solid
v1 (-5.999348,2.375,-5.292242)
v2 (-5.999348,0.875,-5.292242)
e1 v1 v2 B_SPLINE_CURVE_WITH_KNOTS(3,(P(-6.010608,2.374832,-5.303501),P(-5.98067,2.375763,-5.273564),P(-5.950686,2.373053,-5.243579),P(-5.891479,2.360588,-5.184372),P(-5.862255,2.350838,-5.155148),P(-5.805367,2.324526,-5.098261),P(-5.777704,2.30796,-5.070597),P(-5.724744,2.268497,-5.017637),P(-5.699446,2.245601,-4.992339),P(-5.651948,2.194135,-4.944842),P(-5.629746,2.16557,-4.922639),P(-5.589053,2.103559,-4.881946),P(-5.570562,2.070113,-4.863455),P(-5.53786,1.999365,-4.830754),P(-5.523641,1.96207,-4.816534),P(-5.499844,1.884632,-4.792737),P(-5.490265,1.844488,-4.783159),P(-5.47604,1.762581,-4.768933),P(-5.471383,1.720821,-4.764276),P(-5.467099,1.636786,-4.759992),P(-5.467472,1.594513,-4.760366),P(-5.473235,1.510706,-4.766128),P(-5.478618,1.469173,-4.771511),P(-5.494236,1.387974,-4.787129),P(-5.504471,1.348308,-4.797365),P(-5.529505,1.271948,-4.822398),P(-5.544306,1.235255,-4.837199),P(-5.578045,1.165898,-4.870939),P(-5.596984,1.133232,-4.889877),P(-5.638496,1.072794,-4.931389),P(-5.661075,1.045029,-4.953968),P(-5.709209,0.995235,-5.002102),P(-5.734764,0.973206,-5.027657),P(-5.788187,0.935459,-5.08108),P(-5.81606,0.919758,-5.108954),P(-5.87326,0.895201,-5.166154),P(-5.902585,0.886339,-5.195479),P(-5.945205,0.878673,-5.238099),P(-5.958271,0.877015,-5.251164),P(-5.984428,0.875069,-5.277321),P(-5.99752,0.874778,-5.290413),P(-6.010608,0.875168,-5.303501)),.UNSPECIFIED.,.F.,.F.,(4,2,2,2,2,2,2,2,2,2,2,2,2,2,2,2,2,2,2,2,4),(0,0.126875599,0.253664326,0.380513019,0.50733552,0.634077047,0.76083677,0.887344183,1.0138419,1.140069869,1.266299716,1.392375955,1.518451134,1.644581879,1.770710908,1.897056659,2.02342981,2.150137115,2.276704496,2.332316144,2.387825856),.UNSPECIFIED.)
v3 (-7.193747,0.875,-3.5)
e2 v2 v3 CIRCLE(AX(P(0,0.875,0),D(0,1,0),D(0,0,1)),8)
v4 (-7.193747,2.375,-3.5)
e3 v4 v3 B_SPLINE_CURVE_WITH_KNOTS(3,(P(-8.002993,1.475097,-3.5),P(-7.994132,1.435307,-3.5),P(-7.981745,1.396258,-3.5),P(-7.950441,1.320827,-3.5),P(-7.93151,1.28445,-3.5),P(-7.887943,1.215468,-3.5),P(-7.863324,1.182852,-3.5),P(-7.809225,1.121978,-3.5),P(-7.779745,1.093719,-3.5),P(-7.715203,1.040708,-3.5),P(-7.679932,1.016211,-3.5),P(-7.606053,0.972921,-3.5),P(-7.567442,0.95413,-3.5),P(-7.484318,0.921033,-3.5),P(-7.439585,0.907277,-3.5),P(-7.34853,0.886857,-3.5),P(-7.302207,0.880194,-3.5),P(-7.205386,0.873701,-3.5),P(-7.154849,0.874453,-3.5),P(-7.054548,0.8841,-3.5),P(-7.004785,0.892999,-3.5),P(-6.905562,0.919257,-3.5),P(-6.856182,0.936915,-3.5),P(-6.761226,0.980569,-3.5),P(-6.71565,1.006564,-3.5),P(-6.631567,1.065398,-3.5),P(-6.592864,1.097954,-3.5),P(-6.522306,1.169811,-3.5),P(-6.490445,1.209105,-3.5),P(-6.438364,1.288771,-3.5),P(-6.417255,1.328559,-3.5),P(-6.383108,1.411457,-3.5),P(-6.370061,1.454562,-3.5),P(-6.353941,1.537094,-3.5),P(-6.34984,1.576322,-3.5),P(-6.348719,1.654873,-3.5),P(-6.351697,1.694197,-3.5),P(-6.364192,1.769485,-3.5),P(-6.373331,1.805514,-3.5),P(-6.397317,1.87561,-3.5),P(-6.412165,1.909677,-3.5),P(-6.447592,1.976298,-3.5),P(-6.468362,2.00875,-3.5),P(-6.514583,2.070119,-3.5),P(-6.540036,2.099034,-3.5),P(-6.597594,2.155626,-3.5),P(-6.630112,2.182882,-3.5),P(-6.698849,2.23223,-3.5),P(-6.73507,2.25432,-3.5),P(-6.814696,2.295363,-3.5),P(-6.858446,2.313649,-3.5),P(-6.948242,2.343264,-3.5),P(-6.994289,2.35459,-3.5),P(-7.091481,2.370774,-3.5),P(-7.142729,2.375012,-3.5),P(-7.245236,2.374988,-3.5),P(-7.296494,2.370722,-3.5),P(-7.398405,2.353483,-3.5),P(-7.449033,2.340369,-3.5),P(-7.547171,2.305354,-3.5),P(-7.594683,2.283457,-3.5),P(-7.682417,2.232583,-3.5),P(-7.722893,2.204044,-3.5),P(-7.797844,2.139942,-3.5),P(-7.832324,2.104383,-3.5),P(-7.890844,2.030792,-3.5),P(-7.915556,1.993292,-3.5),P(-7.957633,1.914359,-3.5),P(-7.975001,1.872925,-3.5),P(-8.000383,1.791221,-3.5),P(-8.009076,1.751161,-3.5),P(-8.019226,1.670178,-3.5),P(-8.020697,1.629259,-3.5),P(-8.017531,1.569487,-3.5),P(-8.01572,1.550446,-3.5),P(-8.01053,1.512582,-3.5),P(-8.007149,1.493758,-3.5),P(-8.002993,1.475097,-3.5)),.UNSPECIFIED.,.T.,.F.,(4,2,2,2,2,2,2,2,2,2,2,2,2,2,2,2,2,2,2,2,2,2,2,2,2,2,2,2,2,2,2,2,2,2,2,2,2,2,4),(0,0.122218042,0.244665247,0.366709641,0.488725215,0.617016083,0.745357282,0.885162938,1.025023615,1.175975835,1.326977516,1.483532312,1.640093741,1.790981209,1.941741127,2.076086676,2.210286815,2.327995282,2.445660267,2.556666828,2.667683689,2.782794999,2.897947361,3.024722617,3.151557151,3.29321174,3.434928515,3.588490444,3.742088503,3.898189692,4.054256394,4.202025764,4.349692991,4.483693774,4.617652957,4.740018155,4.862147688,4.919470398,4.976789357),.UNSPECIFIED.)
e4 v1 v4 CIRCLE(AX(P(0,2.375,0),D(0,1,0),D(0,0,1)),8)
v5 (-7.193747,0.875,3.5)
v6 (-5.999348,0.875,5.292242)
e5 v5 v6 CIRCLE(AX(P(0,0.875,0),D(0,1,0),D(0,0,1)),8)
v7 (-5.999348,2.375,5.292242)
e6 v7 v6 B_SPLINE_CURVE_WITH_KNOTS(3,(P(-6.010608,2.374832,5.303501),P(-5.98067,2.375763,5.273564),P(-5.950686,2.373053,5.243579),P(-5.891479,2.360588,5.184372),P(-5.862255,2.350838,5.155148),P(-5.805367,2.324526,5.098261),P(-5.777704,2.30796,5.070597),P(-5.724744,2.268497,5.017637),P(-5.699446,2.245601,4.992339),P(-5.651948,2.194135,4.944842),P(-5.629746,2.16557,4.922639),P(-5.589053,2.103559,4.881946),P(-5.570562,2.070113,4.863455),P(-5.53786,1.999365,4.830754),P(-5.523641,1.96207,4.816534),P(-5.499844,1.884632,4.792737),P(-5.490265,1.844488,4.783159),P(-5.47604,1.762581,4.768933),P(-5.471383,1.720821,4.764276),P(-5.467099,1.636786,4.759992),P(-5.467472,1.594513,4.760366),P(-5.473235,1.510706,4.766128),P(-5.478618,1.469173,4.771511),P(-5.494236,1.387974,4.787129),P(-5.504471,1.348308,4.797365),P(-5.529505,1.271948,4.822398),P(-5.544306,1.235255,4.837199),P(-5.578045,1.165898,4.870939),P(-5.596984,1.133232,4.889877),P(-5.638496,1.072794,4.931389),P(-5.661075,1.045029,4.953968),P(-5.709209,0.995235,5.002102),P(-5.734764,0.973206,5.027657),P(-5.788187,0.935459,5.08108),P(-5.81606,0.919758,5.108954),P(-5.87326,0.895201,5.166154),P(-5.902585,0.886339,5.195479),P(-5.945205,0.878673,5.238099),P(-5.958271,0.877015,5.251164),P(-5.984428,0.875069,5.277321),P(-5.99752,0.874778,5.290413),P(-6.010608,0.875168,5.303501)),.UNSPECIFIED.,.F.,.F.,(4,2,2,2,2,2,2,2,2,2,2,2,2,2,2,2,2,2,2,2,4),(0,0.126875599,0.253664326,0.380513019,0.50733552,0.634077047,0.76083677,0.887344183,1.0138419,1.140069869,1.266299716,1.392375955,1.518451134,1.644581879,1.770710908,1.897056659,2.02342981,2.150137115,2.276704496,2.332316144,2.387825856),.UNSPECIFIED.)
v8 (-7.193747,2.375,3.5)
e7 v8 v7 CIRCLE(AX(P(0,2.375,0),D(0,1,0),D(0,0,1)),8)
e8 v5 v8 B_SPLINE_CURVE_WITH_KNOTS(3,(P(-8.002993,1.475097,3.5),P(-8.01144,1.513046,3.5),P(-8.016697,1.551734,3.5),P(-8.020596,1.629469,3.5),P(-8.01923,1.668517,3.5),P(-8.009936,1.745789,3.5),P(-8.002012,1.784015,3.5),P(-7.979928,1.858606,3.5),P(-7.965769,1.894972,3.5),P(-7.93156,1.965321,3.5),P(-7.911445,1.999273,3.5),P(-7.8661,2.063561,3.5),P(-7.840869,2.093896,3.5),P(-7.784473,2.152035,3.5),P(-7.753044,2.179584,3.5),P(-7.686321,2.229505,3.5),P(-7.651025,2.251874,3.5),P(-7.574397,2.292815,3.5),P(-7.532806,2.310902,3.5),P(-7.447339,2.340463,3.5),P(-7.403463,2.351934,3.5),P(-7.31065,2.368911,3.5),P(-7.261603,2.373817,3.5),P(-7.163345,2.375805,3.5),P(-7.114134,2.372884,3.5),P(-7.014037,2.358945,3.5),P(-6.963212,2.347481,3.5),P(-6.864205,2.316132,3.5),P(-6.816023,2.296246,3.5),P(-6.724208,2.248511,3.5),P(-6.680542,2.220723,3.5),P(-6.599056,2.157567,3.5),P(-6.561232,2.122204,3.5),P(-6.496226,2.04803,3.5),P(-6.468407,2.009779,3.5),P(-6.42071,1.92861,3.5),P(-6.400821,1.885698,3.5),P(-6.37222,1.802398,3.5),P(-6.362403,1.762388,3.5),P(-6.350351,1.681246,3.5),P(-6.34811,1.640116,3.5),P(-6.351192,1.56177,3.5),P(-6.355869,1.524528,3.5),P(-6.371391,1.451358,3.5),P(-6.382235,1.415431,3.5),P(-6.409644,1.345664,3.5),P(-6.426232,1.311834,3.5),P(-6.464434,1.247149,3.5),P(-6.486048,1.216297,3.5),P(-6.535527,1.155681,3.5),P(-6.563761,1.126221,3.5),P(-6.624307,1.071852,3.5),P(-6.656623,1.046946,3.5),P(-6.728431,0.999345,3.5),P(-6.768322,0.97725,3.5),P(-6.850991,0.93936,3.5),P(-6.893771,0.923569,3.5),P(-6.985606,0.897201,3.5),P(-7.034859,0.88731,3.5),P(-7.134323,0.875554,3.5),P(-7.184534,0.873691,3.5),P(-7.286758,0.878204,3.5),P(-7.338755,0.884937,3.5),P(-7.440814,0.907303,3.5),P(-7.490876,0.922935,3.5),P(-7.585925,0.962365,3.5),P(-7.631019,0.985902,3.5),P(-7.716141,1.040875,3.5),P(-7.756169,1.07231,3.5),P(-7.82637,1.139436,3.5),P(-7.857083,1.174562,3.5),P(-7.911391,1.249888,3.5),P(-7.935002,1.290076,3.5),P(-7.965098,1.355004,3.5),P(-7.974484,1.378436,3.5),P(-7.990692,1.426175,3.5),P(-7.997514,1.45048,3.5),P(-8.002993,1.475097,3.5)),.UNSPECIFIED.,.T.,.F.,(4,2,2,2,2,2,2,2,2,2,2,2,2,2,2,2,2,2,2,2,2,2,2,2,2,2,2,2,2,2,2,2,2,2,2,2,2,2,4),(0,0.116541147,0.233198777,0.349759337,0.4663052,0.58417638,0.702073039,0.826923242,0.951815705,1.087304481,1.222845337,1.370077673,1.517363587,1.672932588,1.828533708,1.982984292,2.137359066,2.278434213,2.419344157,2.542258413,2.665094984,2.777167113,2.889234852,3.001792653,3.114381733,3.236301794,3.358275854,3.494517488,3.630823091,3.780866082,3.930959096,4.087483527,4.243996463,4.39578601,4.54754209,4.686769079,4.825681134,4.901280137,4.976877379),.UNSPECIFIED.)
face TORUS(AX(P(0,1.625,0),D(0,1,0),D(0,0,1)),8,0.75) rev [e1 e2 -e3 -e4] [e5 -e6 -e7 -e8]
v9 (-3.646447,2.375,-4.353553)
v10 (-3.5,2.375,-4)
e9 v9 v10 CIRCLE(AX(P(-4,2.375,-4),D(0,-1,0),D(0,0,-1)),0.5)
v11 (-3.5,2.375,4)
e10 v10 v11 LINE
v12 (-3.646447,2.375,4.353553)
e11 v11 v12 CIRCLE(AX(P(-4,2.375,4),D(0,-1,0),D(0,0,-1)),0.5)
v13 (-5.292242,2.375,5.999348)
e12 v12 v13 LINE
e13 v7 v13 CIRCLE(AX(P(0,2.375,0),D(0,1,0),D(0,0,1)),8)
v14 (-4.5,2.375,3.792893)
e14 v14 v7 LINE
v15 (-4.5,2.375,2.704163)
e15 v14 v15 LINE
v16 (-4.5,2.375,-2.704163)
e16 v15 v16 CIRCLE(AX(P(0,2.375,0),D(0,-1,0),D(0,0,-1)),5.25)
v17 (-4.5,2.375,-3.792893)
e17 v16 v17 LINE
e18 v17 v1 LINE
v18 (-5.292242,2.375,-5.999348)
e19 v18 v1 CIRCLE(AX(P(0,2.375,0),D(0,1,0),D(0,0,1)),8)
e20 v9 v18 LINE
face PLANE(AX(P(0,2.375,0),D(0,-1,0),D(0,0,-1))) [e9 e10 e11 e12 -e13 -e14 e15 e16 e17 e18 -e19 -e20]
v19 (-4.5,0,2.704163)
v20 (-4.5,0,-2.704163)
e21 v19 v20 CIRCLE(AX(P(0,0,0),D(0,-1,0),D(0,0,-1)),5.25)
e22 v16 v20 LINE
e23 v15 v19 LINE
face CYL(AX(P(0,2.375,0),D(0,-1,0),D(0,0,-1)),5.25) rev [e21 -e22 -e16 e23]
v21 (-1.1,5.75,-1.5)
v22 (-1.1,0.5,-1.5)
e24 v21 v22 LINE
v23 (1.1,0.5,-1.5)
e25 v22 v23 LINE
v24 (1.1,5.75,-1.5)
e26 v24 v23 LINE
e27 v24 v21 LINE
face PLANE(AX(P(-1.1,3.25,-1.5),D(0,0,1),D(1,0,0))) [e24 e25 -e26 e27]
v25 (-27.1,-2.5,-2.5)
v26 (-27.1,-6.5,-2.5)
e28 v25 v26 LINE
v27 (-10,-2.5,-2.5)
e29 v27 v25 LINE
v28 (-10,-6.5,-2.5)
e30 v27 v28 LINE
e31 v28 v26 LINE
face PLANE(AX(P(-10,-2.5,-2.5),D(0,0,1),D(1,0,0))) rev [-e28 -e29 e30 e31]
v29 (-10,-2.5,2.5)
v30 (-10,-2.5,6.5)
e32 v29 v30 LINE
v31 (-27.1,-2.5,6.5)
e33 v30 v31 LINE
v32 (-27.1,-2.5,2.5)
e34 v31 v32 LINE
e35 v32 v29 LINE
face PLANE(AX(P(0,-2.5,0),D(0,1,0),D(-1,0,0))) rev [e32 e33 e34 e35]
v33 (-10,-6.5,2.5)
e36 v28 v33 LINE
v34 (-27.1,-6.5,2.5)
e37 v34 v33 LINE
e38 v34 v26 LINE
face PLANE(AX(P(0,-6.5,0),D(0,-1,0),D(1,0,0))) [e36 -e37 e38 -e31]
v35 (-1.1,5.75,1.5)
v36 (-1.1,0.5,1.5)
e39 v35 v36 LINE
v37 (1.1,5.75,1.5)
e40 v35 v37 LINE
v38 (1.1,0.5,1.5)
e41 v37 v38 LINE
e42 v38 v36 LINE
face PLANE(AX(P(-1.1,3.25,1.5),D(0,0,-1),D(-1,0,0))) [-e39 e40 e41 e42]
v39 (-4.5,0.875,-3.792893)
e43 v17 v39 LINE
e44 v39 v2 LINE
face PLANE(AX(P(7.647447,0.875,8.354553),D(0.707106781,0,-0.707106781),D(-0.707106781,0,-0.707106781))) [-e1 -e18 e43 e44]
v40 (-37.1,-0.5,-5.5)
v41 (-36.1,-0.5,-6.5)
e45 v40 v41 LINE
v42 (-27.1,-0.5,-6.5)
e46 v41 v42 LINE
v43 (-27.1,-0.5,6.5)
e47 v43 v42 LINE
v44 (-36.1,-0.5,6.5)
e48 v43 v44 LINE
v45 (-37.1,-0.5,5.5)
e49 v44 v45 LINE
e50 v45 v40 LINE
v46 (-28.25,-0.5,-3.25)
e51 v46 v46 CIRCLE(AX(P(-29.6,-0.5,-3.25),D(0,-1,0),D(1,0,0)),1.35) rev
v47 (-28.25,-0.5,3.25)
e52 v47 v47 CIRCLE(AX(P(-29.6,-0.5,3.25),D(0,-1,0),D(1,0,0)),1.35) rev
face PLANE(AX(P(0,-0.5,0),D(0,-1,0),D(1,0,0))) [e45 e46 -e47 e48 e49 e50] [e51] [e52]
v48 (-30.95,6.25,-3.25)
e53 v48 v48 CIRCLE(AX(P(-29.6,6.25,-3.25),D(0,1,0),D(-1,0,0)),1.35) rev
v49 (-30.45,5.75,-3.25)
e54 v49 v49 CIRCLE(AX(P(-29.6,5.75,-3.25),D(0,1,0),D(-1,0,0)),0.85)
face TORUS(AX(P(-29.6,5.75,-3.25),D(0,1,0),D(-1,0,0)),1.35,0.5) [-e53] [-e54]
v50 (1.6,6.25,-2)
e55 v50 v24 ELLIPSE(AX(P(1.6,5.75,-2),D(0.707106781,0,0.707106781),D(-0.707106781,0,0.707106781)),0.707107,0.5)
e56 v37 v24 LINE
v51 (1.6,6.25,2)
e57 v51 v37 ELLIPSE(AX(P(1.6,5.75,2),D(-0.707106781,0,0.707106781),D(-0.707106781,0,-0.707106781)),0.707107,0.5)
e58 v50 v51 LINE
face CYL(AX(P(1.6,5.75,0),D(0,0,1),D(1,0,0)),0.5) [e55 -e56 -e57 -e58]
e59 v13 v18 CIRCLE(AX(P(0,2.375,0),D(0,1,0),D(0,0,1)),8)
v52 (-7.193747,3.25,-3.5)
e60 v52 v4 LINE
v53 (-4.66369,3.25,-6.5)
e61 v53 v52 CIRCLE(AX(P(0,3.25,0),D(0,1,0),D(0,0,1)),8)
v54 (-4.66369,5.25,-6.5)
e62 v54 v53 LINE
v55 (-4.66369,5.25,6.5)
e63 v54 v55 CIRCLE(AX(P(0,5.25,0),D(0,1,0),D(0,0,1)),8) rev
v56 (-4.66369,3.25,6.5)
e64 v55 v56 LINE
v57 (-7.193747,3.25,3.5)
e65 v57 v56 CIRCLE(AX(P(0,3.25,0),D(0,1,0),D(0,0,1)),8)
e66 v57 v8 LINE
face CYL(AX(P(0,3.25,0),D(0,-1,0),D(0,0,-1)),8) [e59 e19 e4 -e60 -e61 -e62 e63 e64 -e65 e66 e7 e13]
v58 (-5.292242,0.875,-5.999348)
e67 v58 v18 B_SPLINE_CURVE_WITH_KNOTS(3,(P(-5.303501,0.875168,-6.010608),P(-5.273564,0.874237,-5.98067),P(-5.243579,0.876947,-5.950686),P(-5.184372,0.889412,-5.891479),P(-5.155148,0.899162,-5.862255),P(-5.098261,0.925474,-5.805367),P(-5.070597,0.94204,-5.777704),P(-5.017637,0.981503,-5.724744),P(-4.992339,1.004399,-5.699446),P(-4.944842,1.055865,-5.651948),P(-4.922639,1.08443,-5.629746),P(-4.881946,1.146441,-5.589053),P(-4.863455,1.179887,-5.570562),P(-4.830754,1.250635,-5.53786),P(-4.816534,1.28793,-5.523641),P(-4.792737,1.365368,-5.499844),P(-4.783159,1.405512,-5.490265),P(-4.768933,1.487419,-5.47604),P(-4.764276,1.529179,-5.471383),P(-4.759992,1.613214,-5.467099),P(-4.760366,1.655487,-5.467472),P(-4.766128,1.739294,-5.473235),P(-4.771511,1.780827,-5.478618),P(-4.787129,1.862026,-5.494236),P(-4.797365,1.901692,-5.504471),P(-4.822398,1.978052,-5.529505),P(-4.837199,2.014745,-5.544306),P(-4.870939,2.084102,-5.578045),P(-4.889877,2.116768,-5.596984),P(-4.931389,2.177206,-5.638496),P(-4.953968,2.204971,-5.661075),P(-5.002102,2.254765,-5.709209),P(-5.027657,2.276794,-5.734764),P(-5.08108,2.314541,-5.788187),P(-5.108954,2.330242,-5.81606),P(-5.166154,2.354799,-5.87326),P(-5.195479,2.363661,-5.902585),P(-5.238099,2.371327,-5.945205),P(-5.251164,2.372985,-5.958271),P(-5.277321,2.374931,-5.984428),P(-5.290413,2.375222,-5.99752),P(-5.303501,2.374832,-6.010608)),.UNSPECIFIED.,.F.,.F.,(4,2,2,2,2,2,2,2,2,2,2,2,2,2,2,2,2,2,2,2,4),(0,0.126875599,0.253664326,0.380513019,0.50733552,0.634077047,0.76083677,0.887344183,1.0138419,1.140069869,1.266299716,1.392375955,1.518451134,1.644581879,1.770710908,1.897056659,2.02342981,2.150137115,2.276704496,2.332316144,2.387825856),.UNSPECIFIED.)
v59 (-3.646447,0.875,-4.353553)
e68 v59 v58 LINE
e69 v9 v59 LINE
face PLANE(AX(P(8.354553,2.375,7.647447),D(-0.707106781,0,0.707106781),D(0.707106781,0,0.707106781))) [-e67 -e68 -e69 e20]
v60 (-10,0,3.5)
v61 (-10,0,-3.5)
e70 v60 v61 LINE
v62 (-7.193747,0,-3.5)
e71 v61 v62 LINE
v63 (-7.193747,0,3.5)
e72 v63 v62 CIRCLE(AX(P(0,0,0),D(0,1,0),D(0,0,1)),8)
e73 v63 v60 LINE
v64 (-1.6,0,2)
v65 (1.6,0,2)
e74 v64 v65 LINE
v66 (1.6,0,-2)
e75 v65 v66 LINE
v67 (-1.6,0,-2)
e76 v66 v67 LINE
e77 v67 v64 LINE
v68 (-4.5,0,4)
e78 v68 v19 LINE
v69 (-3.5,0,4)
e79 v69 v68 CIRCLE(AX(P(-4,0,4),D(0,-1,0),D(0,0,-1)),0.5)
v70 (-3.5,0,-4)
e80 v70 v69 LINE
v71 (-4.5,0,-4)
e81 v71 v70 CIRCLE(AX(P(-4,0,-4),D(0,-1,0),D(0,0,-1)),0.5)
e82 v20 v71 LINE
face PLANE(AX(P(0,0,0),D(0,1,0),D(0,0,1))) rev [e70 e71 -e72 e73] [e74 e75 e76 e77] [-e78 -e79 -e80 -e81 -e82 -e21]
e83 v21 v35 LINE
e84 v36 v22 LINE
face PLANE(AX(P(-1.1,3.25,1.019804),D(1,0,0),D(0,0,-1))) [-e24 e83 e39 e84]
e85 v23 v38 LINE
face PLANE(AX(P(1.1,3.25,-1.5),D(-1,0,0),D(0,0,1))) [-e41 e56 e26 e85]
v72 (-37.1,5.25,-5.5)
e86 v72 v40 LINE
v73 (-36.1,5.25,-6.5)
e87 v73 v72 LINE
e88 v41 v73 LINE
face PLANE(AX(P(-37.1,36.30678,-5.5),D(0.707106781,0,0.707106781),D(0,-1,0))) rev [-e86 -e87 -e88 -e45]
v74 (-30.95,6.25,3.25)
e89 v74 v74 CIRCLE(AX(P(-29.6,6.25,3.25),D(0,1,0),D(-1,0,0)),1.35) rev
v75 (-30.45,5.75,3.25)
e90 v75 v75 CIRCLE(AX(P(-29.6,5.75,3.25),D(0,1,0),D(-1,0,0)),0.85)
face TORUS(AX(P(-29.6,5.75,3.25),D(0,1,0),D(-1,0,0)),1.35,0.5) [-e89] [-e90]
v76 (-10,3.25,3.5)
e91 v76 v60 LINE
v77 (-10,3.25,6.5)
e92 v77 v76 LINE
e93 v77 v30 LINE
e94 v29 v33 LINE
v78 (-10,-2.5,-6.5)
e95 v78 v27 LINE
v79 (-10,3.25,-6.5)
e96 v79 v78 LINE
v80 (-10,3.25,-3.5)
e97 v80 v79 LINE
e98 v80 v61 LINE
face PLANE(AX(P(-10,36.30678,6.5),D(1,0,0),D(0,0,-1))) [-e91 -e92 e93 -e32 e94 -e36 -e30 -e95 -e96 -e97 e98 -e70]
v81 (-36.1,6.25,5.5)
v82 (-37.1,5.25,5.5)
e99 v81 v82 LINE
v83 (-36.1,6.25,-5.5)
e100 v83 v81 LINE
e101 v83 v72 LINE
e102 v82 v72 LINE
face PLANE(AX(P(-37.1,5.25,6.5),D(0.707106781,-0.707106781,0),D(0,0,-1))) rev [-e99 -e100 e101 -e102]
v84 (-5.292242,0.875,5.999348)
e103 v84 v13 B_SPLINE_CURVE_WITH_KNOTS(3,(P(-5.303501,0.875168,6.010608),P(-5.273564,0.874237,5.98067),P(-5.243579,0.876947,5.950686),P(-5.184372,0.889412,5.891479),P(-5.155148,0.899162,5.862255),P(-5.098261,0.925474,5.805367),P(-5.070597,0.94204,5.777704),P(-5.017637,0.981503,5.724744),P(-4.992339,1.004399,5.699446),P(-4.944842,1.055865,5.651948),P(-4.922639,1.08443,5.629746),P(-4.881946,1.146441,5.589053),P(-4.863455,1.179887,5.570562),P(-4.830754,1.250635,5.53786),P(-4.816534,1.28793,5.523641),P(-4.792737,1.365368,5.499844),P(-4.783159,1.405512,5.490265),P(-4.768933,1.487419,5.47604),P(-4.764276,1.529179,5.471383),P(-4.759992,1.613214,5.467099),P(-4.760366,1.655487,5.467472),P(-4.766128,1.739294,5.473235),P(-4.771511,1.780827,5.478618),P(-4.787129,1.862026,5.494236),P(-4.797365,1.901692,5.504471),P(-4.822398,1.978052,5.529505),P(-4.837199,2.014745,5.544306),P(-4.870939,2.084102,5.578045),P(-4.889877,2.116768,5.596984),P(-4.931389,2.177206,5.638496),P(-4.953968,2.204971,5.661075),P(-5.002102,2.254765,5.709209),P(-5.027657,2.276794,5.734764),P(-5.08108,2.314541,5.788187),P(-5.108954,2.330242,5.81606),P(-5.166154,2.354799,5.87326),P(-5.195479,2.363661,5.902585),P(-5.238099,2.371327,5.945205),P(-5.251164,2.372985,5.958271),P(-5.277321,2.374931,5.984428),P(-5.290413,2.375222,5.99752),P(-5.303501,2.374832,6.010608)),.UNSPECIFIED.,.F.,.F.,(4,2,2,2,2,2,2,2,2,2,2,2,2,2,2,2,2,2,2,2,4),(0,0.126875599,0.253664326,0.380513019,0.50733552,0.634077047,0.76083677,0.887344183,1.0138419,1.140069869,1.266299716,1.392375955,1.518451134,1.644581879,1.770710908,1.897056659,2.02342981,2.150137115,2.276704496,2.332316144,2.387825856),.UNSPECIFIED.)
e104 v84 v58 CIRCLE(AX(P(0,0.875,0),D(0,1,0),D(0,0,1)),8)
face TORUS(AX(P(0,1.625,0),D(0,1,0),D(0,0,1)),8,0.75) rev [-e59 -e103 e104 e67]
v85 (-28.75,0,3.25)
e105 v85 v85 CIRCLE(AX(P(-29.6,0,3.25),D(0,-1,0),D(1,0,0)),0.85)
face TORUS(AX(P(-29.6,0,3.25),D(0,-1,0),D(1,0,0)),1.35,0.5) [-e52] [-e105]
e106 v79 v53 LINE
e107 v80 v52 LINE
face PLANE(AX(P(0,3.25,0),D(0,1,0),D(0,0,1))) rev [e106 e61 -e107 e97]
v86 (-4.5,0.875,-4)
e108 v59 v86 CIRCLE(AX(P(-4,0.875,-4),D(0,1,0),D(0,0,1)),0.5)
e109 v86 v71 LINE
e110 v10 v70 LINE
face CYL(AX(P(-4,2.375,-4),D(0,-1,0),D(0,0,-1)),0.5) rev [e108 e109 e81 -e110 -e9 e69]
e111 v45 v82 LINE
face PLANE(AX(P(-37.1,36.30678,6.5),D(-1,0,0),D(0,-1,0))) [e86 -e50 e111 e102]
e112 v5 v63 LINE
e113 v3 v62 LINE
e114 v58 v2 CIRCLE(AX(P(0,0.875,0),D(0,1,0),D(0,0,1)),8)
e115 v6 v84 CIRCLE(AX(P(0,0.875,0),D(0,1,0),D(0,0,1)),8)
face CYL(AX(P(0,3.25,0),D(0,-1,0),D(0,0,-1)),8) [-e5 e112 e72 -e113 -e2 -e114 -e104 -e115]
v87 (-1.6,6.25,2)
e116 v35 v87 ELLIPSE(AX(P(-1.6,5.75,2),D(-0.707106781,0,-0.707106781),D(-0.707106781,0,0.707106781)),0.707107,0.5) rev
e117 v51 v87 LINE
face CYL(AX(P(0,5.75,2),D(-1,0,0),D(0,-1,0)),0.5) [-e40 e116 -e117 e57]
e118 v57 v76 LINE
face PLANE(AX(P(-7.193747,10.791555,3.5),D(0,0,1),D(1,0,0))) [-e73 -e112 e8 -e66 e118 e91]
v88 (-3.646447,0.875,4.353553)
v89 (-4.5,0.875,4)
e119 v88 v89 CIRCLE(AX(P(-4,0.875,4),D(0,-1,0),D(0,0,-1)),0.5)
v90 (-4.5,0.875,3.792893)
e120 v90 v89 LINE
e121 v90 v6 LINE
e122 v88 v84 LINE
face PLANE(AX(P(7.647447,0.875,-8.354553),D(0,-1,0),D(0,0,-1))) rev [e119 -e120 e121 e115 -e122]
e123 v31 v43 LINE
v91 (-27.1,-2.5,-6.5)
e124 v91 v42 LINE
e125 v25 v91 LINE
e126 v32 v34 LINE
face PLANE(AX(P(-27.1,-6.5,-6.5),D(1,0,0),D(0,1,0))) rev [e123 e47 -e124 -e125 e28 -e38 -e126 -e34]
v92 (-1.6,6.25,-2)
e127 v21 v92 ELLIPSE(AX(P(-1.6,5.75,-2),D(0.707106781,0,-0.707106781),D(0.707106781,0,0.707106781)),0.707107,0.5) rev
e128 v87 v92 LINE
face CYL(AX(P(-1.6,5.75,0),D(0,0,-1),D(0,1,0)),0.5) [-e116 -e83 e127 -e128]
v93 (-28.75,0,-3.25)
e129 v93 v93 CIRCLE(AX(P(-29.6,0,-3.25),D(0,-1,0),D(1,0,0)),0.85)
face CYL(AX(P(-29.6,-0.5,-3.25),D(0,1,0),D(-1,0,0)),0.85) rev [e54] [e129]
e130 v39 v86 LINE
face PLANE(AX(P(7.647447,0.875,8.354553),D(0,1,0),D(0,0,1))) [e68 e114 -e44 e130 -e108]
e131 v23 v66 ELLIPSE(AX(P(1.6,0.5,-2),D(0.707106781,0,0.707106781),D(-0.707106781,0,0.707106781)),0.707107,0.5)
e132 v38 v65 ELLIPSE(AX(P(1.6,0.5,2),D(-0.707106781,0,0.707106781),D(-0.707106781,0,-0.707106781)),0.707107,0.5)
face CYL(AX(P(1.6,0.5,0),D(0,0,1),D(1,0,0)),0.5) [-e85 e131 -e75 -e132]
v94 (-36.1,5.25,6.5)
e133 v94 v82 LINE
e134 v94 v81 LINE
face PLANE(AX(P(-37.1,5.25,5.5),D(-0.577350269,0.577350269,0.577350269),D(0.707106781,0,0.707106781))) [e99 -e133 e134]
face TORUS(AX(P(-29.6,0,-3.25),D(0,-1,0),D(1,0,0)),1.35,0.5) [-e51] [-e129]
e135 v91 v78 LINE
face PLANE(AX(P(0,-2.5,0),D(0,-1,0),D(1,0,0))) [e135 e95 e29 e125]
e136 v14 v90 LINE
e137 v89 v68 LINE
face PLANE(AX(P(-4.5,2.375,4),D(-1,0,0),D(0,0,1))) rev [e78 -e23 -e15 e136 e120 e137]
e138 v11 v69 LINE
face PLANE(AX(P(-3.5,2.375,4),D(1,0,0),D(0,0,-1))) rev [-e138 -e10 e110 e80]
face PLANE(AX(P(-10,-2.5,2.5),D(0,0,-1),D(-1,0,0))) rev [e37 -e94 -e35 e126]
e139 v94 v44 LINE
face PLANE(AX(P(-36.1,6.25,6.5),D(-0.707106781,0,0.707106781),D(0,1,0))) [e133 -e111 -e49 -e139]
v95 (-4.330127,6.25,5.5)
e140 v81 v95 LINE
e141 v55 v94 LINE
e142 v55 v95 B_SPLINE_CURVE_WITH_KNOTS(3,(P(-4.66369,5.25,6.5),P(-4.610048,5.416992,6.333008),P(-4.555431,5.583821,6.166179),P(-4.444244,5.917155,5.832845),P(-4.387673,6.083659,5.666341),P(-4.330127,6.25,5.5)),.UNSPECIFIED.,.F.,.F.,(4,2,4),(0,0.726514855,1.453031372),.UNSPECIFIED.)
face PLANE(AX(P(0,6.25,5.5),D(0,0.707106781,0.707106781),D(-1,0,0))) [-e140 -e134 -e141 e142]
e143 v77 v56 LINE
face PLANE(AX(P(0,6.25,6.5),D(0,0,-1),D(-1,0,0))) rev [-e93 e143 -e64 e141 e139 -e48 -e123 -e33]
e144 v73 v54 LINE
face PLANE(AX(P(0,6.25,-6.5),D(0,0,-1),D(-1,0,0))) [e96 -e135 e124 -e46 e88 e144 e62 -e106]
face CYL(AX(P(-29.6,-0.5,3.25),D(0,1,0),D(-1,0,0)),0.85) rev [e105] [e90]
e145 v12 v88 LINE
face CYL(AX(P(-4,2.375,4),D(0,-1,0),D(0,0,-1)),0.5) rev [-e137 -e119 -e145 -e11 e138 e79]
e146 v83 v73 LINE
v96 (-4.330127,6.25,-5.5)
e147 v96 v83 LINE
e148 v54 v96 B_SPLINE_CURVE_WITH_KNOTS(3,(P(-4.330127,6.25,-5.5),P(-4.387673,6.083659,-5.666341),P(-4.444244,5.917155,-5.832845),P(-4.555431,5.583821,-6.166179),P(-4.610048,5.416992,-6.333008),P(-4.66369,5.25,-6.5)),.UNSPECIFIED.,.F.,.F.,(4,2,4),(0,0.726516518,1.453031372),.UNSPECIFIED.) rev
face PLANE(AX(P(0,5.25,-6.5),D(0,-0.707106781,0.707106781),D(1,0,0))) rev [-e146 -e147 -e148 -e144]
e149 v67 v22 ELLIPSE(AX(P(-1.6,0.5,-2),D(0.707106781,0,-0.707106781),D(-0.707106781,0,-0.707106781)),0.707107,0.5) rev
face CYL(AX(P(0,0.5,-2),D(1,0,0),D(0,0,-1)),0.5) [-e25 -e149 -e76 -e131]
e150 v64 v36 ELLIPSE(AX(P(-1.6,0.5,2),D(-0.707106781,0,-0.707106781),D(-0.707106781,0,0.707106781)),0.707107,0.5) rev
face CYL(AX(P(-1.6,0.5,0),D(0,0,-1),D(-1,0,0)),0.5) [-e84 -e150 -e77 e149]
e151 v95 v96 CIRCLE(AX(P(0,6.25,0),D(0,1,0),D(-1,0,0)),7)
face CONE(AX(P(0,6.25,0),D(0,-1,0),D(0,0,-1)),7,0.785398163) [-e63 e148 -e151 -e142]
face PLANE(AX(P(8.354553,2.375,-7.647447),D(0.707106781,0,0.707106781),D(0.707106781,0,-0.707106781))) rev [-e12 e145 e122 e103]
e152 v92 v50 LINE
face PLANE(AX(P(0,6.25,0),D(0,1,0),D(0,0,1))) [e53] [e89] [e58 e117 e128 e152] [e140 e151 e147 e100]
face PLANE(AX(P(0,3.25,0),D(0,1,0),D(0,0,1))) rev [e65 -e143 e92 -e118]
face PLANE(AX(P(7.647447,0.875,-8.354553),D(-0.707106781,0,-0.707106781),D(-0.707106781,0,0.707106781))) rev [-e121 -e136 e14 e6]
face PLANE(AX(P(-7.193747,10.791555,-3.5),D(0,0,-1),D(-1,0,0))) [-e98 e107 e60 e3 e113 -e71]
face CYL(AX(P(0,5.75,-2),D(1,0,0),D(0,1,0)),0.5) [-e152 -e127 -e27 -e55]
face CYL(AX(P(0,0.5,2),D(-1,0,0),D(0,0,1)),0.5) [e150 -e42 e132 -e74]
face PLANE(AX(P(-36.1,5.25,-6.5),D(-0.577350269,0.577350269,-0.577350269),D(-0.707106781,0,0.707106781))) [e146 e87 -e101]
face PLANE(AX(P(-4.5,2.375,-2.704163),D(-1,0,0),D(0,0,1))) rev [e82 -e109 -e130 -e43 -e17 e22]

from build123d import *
from build123d.topology import SkipClean

# Parameters (mm, degrees)
SKETCH1_R               = 8
BOSS_EXTRUDE1_DEPTH     = 3.25
SKETCH3_R               = 8
SKETCH3_W               = 2.2
SKETCH3_H               = 3
BOSS_EXTRUDE2_DEPTH     = 3
BOSS_EXTRUDE3_START     = -3
SKETCH4_W               = 27.1
SKETCH4_H               = 13
BOSS_EXTRUDE3_DEPTH     = 6.75
CUT_EXTRUDE1_DEPTH      = 39.548313841
CUT_EXTRUDE1_DEPTH_BACK = 39.548313841
SKETCH5_R               = 0.85
CUT_EXTRUDE2_DEPTH      = 2.375
CUT_EXTRUDE3_REACH      = 36.846
CUT_EXTRUDE3_END_RADIUS = 0.5
SKETCH7_W               = 1
SKETCH7_H               = 1.5
CUT_EXTRUDE4_REACH      = 36.846
CUT_EXTRUDE4_END_RADIUS = 0.5
SKETCH8_W               = 1
SKETCH8_H               = 1.5
FILLET1_R               = 0.5
CHAMFER1_SIZE           = 1
BOSS_EXTRUDE4_REACH     = 40.464
SKETCH11_W              = 17.1
SKETCH11_H              = 13
BOSS_EXTRUDE5_DEPTH     = 6
SKETCH12_W              = 17.1
SKETCH12_H              = 4
CUT_EXTRUDE5_DEPTH      = 4


# Read off the part's stored shape, not the designer's step: Cut-Revolve2
with BuildPart() as part:
    # Sketch1 → Boss-Extrude1 (new body)
    with BuildSketch(Plane(origin=(0, 0, 0), x_dir=(1, 0, 0), z_dir=(0, 1, 0))):
        with Locations(Location((0, 0, 0), (0, 0, 90))):
            Circle(SKETCH1_R)
        Polygon((-1.1, 1.019803903), (-1.1, -1.019803903), (-1.1, -1.5), (1.1, -1.5), (1.1, -1.019803903), (1.1, 1.019803903), (1.1, 1.5), (-1.1, 1.5), align=None, mode=Mode.SUBTRACT)
    extrude(amount=BOSS_EXTRUDE1_DEPTH)

    # Sketch2 → Cut-Revolve1 (revolve, cut)
    with BuildSketch(Plane(origin=(0, 0, 0), x_dir=(0, 0, -1), z_dir=(1, 0, 0))):
        with BuildLine():
            Line((8, 0.875), (8, 2.375))
            ThreePointArc((8, 2.375), (7.25, 1.625), (8, 0.875))
        make_face()
    revolve(axis=Axis((0, 3.25, 0), (0, -1, 0)), mode=Mode.SUBTRACT)

    # Sketch3 → Boss-Extrude2 (add)
    # profile 1 of 2: a face of its own
    with BuildSketch(Plane(origin=(0, 3.25, 0), x_dir=(1, 0, 0), z_dir=(0, 1, 0))):
        with Locations(Location((0, 0, 0), (0, 0, 125.659087696))):
            Circle(SKETCH3_R)
        Rectangle(SKETCH3_W, SKETCH3_H, mode=Mode.SUBTRACT)
    # profile 2 of 2: a face of its own
    with BuildSketch(Plane(origin=(0, 3.25, 0), x_dir=(1, 0, 0), z_dir=(0, 1, 0))):
        with BuildLine():
            Line((-4.663689527, 6.5), (-15, 6.5))
            Line((-15, 6.5), (-15, -6.5))
            Line((-15, -6.5), (-4.663689527, -6.5))
            ThreePointArc((-4.663689527, -6.5), (-8, 0), (-4.663689527, 6.5))
        make_face()
    extrude(amount=BOSS_EXTRUDE2_DEPTH)

    # Sketch4 → Boss-Extrude3 (add)
    with BuildSketch(Plane.XZ.offset(-3.25).offset(BOSS_EXTRUDE3_START)):
        with Locations((-23.55, 0)):
            Rectangle(SKETCH4_W, SKETCH4_H)
    extrude(amount=BOSS_EXTRUDE3_DEPTH)

    # Sketch5 → Cut-Extrude1 (cut, two sides: drawn at the far end of the back side and taken through both)
    with BuildSketch(Plane(origin=(0, 6.25, 0), x_dir=(1, 0, 0), z_dir=(0, 1, 0)).offset(-CUT_EXTRUDE1_DEPTH_BACK)):
        with Locations(Location((-29.6, 3.25, 0), (0, 0, 180))):
            Circle(SKETCH5_R)
        with Locations(Location((-29.6, -3.25, 0), (0, 0, 180))):
            Circle(SKETCH5_R)
    extrude(amount=CUT_EXTRUDE1_DEPTH + CUT_EXTRUDE1_DEPTH_BACK, mode=Mode.SUBTRACT)

    # Sketch6 → Cut-Extrude2 (cut)
    with BuildSketch(Plane(origin=(0, 0, 0), x_dir=(-1, 0, 0), z_dir=(0, -1, 0))):
        with BuildLine():
            Line((3.5, -4), (3.5, 4))
            ThreePointArc((3.5, 4), (4, 4.5), (4.5, 4))
            Line((4.5, 4), (4.5, 2.704163457))
            ThreePointArc((4.5, 2.704163457), (5.25, 0), (4.5, -2.704163457))
            Line((4.5, -2.704163457), (4.5, -4))
            ThreePointArc((4.5, -4), (4, -4.5), (3.5, -4))
        make_face()
    extrude(amount=-CUT_EXTRUDE2_DEPTH, mode=Mode.SUBTRACT)

    # Cut-Extrude3: up to this cylinder (the profile starts outside it)
    cut_extrude3_end = Plane(origin=(-4, 1.625, 4), z_dir=(0, -1, 0)) * Cylinder(CUT_EXTRUDE3_END_RADIUS, 75.692, mode=Mode.PRIVATE)
    # Sketch7 → Cut-Extrude3 (cut, up to the surface)
    with BuildSketch(Plane(origin=(-5.656854249, 0, 5.656854249), x_dir=(0.707106781186546, 0, 0.7071067811865491), z_dir=(-0.7071067811865491, 0, 0.707106781186546)), mode=Mode.PRIVATE) as cut_extrude3_sk1:
        with Locations((0, 1.625)):
            Rectangle(SKETCH7_W, SKETCH7_H)
    cut_extrude3_tool1 = extrude(cut_extrude3_sk1.sketch, amount=-CUT_EXTRUDE3_REACH, mode=Mode.PRIVATE) - cut_extrude3_end
    add(cut_extrude3_tool1.solids().sort_by_distance((-5.656854, 1.625, 5.656854))[0], mode=Mode.SUBTRACT)

    # Cut-Extrude4: up to this cylinder (the profile starts outside it)
    cut_extrude4_end = Plane(origin=(-4, 1.625, -4), z_dir=(0, -1, 0)) * Cylinder(CUT_EXTRUDE4_END_RADIUS, 75.692, mode=Mode.PRIVATE)
    # Sketch8 → Cut-Extrude4 (cut, up to the surface)
    with BuildSketch(Plane(origin=(-5.656854249, 0, -5.656854249), x_dir=(0.7071067811865457, 0, -0.7071067811865493), z_dir=(0.7071067811865493, 0, 0.7071067811865457)), mode=Mode.PRIVATE) as cut_extrude4_sk1:
        with Locations((0, 1.625)):
            Rectangle(SKETCH8_W, SKETCH8_H)
    cut_extrude4_tool1 = extrude(cut_extrude4_sk1.sketch, amount=CUT_EXTRUDE4_REACH, mode=Mode.PRIVATE) - cut_extrude4_end
    add(cut_extrude4_tool1.solids().sort_by_distance((-5.656854, 1.625, -5.656854))[0], mode=Mode.SUBTRACT)

    # Fillet1
    fillet1_edges = [part.edges().sort_by_distance(p)[0] for p in [
        (1.1, 6.25, 0),
        (0, 6.25, 1.5),
        (-1.1, 6.25, 0),
        (0, 6.25, -1.5),
        (-28.75, 6.25, -3.25),
        (-28.75, -0.5, -3.25),
        (-28.75, 6.25, 3.25),
        (-28.75, -0.5, 3.25),
        (-1.1, 0, 0),
        (0, 0, 1.5),
        (1.1, 0, 0),
        (0, 0, -1.5),
    ]]
    fillet(fillet1_edges, radius=FILLET1_R)

    # Chamfer1
    chamfer1_edges = [part.edges().sort_by_distance(p)[0] for p in [
        (-20.881844763, 6.25, -6.5),
        (8, 6.25, 0),
        (-20.881844763, 6.25, 6.5),
        (-37.1, 2.875, 6.5),
        (-37.1, 6.25, 0),
        (-37.1, 2.875, -6.5),
    ]]
    chamfer(chamfer1_edges, length=CHAMFER1_SIZE)

    # Boss-Extrude4: up to this face of the body (flat: up to its plane)
    boss_extrude4_end = Plane(part.part.faces().sort_by_distance((-8.350083425, 3.25, 0))[0])
    # Sketch9 → Boss-Extrude4 (add, up to the picked face)
    with BuildSketch(Plane.XZ, mode=Mode.PRIVATE) as boss_extrude4_sk1:
        with BuildLine():
            Line((-7.193747285, -3.5), (-10, -3.5))
            Line((-10, -3.5), (-10, 3.5))
            Line((-10, 3.5), (-7.193747285, 3.5))
            ThreePointArc((-7.193747285, 3.5), (-8, 0), (-7.193747285, -3.5))
        make_face()
    boss_extrude4_tool1 = split(extrude(boss_extrude4_sk1.sketch, amount=-BOSS_EXTRUDE4_REACH, mode=Mode.PRIVATE), bisect_by=boss_extrude4_end, keep=Keep.BOTH, mode=Mode.PRIVATE)
    add(boss_extrude4_tool1.solids().sort_by(Axis((-8.85589, 0, 0), (0, 1, 0)))[0])

    # Cut-Revolve2 outline → Cut-Revolve2 (revolve, cut)
    with SkipClean():  # the faces are left unmerged after this step: merging them gives an invalid solid
        with BuildSketch(Plane.XY):
            with BuildLine():
                ThreePointArc((8, 0.875), (8.75, 1.625), (8, 2.375))
                Line((8, 2.375), (8, 0.875))
            make_face()
        revolve(axis=Axis((0, 0, 0), (0, 1, 0)), mode=Mode.SUBTRACT)

    # Sketch11 → Boss-Extrude5 (add)
    with SkipClean():  # the faces are left unmerged after this step: merging them gives an invalid solid
        with BuildSketch(Plane.XZ.offset(0.5)):
            with Locations((-18.55, 0)):
                Rectangle(SKETCH11_W, SKETCH11_H)
        extrude(amount=BOSS_EXTRUDE5_DEPTH)

    # Sketch12 → Cut-Extrude5 (cut)
    with SkipClean():  # the faces are left unmerged after this step: merging them gives an invalid solid
        with BuildSketch(Plane.XZ.offset(6.5)):
            with Locations((-18.55, -4.5)):
                Rectangle(SKETCH12_W, SKETCH12_H)
            with Locations((-18.55, 4.5)):
                Rectangle(SKETCH12_W, SKETCH12_H)
        extrude(amount=-CUT_EXTRUDE5_DEPTH, mode=Mode.SUBTRACT)


solid = part.part
